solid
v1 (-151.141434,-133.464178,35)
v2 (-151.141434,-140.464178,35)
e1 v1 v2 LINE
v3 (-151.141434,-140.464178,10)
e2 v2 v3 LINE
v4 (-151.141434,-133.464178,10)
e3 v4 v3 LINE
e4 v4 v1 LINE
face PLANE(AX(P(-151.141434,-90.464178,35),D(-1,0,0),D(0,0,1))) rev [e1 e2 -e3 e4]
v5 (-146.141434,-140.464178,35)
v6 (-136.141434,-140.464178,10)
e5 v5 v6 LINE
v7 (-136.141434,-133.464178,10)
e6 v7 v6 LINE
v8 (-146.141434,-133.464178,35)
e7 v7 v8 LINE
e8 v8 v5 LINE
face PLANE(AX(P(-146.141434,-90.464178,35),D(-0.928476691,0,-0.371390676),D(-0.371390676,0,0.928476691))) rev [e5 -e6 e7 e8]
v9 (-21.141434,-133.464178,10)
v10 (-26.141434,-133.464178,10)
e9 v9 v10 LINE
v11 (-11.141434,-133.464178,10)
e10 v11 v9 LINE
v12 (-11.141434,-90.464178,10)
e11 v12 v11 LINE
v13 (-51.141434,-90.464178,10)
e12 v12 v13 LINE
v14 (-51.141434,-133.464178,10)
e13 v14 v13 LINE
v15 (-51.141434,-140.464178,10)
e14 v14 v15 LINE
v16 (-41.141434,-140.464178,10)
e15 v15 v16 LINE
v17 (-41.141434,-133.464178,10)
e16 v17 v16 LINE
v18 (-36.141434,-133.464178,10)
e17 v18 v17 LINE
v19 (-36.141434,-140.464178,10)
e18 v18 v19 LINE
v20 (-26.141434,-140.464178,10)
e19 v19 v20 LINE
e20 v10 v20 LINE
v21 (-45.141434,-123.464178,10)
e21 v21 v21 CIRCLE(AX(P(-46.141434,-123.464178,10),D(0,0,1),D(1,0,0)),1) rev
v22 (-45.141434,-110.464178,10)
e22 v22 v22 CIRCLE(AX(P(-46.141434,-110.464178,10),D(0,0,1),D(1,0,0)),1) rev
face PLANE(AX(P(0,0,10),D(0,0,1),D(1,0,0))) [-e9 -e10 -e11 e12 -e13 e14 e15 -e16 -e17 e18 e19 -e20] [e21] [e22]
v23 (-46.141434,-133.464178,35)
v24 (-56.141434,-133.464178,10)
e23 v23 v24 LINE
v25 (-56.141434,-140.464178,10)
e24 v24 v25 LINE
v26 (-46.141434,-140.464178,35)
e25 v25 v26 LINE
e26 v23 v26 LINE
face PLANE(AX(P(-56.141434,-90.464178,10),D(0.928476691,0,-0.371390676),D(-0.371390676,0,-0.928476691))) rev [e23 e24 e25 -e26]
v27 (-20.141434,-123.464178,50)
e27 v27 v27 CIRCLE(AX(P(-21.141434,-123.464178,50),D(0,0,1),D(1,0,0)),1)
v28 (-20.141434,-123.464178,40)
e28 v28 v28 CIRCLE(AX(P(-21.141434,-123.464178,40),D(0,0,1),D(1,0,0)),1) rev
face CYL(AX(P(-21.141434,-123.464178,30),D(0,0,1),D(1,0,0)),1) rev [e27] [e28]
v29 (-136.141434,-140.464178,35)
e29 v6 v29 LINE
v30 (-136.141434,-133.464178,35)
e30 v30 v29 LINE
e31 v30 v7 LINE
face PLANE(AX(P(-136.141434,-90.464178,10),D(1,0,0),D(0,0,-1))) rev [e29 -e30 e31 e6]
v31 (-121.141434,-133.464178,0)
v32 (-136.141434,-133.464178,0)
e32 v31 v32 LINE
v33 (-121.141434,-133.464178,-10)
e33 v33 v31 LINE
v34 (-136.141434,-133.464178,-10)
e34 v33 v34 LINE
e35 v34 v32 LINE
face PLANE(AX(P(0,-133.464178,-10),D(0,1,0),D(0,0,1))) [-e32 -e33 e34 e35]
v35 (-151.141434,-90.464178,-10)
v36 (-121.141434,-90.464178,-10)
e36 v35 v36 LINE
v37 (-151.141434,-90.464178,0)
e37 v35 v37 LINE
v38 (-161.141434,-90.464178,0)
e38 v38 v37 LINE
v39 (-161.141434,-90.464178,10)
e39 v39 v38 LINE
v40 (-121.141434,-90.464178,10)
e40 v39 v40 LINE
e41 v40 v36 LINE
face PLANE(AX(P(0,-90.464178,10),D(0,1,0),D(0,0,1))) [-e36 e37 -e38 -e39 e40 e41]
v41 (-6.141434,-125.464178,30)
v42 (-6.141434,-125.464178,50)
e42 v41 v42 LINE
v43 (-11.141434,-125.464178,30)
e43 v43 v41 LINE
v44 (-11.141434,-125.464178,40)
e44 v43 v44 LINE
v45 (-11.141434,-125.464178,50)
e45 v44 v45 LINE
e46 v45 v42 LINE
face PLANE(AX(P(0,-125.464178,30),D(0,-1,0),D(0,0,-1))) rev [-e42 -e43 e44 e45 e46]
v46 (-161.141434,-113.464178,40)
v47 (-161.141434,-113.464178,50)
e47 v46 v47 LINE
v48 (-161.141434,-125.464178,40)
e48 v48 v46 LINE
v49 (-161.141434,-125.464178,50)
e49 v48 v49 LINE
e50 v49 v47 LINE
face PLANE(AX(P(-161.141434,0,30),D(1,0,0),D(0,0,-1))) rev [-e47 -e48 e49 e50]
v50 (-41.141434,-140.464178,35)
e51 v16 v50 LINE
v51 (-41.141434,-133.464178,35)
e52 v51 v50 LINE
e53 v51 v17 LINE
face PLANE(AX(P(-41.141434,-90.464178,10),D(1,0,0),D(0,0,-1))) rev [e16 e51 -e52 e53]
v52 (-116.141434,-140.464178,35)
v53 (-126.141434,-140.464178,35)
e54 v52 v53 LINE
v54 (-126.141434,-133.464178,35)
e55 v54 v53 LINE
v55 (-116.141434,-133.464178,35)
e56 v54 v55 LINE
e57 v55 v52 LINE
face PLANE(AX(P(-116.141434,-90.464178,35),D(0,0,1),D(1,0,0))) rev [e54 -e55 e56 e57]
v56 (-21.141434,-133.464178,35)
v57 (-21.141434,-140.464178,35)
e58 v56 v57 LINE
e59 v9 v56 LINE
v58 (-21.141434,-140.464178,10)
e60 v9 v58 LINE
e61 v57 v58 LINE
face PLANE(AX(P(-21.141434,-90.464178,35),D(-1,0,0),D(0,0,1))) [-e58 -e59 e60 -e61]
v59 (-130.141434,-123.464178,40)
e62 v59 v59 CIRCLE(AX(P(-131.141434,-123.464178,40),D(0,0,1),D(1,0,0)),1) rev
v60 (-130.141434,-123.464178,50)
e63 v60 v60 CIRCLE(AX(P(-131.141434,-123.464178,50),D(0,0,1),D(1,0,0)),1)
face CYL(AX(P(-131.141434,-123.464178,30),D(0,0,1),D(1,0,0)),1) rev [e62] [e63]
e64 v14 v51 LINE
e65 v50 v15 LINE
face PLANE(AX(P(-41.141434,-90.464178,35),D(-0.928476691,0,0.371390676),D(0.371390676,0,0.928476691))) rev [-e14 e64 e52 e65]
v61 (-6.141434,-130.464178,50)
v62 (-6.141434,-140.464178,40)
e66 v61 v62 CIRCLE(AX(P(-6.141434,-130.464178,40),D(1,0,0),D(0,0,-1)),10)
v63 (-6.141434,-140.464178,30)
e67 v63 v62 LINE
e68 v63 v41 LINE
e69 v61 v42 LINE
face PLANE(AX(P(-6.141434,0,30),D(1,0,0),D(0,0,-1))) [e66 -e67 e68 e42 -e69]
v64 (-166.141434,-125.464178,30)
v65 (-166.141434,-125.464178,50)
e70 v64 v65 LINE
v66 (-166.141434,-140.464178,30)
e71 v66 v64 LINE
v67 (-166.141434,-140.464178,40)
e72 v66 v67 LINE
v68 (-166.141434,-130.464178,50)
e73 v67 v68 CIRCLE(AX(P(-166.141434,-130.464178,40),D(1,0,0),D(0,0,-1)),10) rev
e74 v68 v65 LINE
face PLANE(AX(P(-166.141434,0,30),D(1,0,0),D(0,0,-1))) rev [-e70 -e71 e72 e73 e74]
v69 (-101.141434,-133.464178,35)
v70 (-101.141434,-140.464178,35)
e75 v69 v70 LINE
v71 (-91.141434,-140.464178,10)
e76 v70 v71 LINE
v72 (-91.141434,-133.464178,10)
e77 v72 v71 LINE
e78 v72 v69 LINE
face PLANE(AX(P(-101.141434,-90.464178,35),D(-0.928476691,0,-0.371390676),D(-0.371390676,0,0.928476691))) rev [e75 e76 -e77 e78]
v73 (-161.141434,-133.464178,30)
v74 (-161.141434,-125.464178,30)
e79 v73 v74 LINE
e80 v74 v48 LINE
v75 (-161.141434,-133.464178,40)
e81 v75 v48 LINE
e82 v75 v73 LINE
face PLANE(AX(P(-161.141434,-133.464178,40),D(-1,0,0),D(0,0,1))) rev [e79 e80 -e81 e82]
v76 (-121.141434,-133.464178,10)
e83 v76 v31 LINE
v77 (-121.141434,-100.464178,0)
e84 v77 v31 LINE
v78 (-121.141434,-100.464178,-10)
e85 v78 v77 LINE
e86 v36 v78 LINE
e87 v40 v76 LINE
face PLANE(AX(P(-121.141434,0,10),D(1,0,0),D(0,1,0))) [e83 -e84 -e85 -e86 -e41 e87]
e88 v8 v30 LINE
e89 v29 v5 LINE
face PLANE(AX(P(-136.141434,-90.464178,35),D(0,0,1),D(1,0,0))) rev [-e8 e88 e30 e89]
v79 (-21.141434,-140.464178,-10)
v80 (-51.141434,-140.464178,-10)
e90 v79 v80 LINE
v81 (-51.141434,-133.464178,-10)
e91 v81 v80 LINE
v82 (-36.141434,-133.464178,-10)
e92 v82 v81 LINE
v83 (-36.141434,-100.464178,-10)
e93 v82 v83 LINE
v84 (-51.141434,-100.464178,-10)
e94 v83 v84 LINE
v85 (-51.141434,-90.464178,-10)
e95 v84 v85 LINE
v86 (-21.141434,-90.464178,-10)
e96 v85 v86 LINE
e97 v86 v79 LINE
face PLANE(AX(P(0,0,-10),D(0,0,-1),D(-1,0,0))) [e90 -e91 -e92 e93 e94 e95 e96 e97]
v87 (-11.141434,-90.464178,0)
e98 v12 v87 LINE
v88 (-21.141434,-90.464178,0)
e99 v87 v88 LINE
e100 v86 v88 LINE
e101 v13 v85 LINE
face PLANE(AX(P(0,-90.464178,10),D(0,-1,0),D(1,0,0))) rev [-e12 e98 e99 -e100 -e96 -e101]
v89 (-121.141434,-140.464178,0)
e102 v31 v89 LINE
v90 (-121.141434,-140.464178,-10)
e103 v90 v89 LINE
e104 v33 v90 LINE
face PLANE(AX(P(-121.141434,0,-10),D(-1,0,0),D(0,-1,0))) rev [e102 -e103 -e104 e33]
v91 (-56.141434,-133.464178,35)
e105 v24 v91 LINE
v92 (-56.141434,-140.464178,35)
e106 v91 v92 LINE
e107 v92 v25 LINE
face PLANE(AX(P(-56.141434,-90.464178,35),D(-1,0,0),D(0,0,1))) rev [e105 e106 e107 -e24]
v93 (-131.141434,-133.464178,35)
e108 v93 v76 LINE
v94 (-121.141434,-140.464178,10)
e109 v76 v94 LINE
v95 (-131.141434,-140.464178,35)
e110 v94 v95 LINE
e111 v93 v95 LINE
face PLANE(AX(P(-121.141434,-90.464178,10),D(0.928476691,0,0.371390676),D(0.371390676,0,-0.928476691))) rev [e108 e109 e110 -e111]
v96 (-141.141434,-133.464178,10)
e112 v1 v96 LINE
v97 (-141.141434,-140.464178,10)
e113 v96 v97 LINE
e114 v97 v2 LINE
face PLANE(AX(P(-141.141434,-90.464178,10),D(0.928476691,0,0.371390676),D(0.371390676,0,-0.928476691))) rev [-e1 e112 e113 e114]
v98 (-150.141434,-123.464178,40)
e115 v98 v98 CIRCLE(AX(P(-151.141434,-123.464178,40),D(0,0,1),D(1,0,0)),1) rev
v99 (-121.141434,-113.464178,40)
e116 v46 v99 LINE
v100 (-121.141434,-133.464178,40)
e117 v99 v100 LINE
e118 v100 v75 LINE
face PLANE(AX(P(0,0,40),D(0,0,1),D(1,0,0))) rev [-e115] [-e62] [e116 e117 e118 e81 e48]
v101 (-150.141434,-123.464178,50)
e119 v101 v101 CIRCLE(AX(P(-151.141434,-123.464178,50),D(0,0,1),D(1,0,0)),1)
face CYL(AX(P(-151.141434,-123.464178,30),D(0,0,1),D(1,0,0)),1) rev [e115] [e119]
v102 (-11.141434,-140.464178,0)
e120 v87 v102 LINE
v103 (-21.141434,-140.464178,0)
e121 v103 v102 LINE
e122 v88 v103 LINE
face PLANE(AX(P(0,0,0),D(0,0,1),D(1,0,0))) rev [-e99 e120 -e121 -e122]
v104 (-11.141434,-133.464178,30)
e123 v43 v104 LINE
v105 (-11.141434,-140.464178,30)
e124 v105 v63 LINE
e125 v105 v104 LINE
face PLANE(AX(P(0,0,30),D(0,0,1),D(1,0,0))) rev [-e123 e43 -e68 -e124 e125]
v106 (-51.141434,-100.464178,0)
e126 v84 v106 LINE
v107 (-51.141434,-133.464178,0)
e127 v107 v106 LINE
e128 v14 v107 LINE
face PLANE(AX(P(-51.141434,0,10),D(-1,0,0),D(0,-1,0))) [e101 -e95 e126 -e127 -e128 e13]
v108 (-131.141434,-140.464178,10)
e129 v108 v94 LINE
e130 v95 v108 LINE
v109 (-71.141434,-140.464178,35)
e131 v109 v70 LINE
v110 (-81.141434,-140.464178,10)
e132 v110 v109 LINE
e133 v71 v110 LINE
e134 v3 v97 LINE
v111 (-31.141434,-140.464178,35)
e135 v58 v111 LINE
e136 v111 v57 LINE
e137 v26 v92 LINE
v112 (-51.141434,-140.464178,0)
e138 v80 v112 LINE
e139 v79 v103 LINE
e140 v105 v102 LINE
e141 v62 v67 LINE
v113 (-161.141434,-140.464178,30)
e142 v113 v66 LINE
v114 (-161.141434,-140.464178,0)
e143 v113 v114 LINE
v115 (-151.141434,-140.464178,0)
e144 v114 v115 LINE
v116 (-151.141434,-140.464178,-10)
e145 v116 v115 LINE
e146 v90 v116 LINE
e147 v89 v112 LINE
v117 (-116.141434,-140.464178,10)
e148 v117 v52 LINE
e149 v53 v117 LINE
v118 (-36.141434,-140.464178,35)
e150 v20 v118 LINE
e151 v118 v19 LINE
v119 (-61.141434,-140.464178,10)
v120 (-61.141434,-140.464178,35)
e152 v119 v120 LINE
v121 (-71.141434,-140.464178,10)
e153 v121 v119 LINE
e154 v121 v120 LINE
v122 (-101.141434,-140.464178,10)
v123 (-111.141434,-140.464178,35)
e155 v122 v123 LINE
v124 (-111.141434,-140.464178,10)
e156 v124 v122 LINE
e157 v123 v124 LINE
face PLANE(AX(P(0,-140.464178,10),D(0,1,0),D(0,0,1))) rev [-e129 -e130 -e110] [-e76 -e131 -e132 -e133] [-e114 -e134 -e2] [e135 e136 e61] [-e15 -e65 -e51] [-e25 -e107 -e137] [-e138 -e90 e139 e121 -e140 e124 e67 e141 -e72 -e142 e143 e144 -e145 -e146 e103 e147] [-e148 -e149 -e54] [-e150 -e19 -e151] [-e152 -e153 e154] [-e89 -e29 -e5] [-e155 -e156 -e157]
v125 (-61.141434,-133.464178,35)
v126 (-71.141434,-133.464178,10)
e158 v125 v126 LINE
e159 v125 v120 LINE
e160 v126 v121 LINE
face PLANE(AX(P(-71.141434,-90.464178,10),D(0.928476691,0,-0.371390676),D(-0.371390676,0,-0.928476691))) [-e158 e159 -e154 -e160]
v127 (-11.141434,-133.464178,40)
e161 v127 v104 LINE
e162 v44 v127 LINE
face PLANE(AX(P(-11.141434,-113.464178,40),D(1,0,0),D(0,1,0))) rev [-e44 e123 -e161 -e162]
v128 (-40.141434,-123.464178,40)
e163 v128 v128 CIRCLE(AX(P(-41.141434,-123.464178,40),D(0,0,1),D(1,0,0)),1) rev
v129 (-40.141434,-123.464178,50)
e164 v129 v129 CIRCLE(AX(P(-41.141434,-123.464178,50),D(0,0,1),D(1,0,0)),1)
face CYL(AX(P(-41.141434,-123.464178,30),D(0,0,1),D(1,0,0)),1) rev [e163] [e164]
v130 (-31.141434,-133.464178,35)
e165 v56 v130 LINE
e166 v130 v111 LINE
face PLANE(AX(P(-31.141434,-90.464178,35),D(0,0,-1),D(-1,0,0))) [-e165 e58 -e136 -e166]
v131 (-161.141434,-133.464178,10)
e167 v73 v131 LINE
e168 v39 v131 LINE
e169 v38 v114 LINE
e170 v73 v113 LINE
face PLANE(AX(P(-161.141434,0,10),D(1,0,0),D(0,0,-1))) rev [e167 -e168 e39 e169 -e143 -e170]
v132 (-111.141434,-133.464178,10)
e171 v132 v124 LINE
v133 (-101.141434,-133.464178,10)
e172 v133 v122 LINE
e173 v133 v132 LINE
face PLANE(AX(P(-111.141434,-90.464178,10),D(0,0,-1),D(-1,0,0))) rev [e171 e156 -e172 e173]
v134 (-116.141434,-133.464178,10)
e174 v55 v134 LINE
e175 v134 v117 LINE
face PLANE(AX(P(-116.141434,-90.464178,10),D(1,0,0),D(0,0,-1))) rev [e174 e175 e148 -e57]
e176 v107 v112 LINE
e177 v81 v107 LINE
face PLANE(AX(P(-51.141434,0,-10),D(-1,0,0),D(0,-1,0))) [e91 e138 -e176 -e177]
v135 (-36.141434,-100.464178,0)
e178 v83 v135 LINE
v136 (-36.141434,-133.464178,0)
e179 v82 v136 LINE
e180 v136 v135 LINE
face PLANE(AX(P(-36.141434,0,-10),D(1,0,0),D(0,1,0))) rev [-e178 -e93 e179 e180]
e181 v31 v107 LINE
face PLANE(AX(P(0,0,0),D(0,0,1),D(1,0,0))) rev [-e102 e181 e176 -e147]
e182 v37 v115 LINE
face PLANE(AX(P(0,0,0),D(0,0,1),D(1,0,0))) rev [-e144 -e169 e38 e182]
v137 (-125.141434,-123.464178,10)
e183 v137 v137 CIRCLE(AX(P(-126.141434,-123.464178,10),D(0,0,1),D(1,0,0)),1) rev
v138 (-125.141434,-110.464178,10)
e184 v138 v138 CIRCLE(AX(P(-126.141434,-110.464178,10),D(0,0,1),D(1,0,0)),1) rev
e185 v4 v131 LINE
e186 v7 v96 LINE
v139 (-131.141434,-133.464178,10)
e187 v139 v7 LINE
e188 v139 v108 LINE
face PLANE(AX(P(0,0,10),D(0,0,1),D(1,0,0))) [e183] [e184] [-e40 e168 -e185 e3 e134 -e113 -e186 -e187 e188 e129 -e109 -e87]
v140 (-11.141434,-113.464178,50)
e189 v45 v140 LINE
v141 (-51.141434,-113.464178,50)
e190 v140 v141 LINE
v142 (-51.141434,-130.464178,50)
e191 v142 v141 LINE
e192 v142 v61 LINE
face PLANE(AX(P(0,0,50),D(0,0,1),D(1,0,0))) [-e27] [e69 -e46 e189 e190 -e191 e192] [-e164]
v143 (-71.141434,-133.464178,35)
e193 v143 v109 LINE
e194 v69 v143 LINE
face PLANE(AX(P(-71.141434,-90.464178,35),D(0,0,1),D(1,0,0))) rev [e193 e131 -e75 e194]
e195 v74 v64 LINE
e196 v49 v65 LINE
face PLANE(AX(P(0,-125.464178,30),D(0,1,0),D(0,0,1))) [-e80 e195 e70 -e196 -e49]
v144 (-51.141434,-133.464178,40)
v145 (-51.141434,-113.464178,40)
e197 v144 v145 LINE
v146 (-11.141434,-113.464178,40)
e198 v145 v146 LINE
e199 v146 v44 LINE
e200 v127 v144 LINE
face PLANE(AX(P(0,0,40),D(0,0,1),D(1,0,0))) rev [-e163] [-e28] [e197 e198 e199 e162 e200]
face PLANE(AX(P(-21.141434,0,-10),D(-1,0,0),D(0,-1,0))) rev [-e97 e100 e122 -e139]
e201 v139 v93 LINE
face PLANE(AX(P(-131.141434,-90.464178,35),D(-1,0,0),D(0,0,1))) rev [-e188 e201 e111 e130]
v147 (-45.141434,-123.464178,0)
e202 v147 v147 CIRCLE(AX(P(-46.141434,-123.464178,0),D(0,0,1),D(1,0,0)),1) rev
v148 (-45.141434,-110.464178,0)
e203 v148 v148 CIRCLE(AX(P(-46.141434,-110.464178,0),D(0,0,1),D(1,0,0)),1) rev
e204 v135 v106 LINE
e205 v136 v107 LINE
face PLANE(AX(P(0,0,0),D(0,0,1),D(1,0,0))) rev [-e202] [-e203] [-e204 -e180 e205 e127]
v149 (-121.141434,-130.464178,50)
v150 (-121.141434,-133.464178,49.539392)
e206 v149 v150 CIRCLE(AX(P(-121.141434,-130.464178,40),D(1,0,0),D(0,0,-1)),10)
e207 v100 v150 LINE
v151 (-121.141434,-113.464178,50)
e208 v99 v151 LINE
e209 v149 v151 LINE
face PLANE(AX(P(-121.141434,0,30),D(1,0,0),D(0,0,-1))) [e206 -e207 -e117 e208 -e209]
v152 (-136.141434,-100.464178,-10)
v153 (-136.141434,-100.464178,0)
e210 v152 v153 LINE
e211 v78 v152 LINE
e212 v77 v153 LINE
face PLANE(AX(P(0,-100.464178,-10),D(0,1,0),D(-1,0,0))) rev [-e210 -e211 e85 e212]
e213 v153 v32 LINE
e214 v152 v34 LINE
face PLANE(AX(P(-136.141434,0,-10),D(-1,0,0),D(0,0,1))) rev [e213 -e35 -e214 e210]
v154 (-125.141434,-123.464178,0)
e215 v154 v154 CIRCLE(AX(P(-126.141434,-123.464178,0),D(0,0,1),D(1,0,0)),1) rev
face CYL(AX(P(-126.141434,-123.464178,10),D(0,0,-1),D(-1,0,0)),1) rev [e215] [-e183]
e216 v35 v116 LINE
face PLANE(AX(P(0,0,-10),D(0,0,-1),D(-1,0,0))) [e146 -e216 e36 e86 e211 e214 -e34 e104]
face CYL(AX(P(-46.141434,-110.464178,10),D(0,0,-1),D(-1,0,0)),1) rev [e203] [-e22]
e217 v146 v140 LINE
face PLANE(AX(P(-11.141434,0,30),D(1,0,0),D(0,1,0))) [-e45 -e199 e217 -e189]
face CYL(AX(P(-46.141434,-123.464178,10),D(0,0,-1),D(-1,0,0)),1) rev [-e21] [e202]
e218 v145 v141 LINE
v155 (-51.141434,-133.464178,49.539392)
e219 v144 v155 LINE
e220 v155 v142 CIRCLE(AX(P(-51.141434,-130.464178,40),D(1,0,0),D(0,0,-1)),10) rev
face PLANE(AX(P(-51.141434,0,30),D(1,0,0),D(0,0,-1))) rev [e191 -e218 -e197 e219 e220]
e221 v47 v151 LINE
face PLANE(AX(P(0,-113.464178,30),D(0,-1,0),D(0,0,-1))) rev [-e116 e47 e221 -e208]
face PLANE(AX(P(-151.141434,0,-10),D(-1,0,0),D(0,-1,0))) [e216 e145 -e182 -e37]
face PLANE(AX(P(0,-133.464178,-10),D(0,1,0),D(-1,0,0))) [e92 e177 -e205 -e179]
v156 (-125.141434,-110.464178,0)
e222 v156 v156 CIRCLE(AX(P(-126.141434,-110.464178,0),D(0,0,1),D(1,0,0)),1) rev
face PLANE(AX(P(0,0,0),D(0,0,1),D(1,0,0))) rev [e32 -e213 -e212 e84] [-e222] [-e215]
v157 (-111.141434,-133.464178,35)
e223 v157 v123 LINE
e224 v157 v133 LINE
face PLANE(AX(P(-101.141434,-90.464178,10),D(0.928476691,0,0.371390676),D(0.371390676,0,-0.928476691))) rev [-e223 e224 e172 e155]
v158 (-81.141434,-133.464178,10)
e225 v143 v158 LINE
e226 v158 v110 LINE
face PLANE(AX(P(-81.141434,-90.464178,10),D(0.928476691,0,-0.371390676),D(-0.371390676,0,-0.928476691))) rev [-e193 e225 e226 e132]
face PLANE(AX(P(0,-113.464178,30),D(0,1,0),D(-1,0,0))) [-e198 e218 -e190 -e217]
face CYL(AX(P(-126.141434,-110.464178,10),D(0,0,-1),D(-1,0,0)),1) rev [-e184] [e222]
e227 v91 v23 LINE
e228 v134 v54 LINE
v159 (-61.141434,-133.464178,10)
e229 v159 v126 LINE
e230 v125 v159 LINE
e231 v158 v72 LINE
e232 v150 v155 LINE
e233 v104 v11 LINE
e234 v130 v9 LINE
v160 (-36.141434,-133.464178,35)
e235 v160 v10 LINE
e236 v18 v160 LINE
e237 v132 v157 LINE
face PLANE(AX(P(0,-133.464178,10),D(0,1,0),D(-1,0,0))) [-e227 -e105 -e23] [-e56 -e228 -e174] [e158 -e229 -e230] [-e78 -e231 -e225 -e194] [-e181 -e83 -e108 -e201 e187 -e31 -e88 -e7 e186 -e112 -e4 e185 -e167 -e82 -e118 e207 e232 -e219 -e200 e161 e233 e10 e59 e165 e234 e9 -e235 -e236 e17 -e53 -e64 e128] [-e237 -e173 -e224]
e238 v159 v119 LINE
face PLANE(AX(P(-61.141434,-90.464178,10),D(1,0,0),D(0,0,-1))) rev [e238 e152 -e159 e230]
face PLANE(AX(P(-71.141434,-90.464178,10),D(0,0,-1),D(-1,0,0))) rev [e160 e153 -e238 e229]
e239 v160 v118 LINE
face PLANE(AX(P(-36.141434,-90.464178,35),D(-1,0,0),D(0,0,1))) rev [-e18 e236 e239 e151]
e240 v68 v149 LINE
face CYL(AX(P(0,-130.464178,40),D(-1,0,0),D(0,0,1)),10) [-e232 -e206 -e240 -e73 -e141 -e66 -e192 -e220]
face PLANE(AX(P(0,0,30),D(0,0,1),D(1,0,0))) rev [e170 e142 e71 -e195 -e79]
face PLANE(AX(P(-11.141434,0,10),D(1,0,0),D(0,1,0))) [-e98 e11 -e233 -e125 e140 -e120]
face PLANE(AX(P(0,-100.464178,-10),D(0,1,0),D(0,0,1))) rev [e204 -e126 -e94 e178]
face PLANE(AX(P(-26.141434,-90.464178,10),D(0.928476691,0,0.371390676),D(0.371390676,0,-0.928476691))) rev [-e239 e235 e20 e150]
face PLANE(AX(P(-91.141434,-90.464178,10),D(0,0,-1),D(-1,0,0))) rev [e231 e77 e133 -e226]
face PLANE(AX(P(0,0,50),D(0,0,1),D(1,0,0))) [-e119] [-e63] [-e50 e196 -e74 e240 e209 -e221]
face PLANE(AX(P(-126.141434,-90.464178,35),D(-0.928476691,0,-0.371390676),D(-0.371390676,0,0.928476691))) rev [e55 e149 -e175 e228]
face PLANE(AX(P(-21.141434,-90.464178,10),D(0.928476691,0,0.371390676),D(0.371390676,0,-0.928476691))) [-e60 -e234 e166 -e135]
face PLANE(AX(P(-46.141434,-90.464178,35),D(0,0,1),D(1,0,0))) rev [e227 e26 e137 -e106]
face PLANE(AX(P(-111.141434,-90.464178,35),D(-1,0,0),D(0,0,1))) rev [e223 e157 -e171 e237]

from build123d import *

# Parameters (mm, degrees)
ESQUISSE2_W             = 15
ESQUISSE2_H             = 33
ESQUISSE2_R             = 1
ESQUISSE2_W_2           = 70
ESQUISSE2_H_2           = 7
BOSS_EXTRU_1_DEPTH      = 10
ESQUISSE3_W             = 150
ESQUISSE3_H             = 7
BOSS_EXTRU_2_DEPTH      = 40
ESQUISSE4_W             = 40
ESQUISSE4_H             = 20
ESQUISSE4_R             = 1
ESQUISSE4_W_2           = 5
ESQUISSE4_H_2           = 15
BOSS_EXTRU_3_DEPTH      = 20
ENL_V_MAT_EXTRU_1_DEPTH = 181.562942337
ESQUISSE6_W             = 40
ESQUISSE6_H             = 20
ENL_V_MAT_EXTRU_2_DEPTH = 10
CONG_1_R                = 10
BOSS_EXTRU_4_DEPTH      = 10


with BuildPart() as part:
    # Esquisse2 → Boss.-Extru.1 (new body)
    # profile 1 of 5: a face of its own
    with BuildSketch(Plane.XY):
        Polygon((-121.141434162, -90.464178298), (-161.141434162, -90.464178298), (-161.141434162, -140.464178298), (-121.141434162, -140.464178298), (-121.141434162, -133.464178298), (-136.141434162, -133.464178298), (-136.141434162, -100.464178298), (-121.141434162, -100.464178298), align=None)
    # profile 2 of 5: a face of its own
    with BuildSketch(Plane.XY):
        with Locations((-128.641434162, -116.964178298)):
            Rectangle(ESQUISSE2_W, ESQUISSE2_H)
        with Locations((-126.141434162, -123.464178298)):
            Circle(ESQUISSE2_R, mode=Mode.SUBTRACT)
        with Locations((-126.141434162, -110.464178298)):
            Circle(ESQUISSE2_R, mode=Mode.SUBTRACT)
    # profile 3 of 5: a face of its own
    with BuildSketch(Plane.XY):
        with Locations((-86.141434162, -136.964178298)):
            Rectangle(ESQUISSE2_W_2, ESQUISSE2_H_2)
    # profile 4 of 5: a face of its own
    with BuildSketch(Plane.XY):
        with Locations((-43.641434162, -116.964178298)):
            Rectangle(ESQUISSE2_W, ESQUISSE2_H)
        with Locations((-46.141434162, -123.464178298)):
            Circle(ESQUISSE2_R, mode=Mode.SUBTRACT)
        with Locations((-46.141434162, -110.464178298)):
            Circle(ESQUISSE2_R, mode=Mode.SUBTRACT)
    # profile 5 of 5: a face of its own
    with BuildSketch(Plane.XY):
        Polygon((-51.141434162, -133.464178298), (-51.141434162, -140.464178298), (-11.141434162, -140.464178298), (-11.141434162, -90.464178298), (-51.141434162, -90.464178298), (-51.141434162, -100.464178298), (-36.141434162, -100.464178298), (-36.141434162, -133.464178298), align=None)
    extrude(amount=BOSS_EXTRU_1_DEPTH)

    # Esquisse3 → Boss.-Extru.2 (add)
    with BuildSketch(Plane.XY.offset(10)):
        with Locations((-86.141434162, -136.964178298)):
            Rectangle(ESQUISSE3_W, ESQUISSE3_H)
    extrude(amount=BOSS_EXTRU_2_DEPTH)

    # Esquisse4 → Boss.-Extru.3 (add)
    # profile 1 of 4: a face of its own
    with BuildSketch(Plane.XY.offset(50)):
        with Locations((-141.141434162, -123.464178298)):
            Rectangle(ESQUISSE4_W, ESQUISSE4_H)
        with Locations((-151.141434162, -123.464178298)):
            Circle(ESQUISSE4_R, mode=Mode.SUBTRACT)
        with Locations((-131.141434162, -123.464178298)):
            Circle(ESQUISSE4_R, mode=Mode.SUBTRACT)
    # profile 2 of 4: a face of its own
    with BuildSketch(Plane.XY.offset(50)):
        with Locations((-31.141434162, -123.464178298)):
            Rectangle(ESQUISSE4_W, ESQUISSE4_H)
        with Locations((-41.141434162, -123.464178298)):
            Circle(ESQUISSE4_R, mode=Mode.SUBTRACT)
        with Locations((-21.141434162, -123.464178298)):
            Circle(ESQUISSE4_R, mode=Mode.SUBTRACT)
    # profile 3 of 4: a face of its own
    with BuildSketch(Plane.XY.offset(50)):
        with Locations((-163.641434162, -132.964178298)):
            Rectangle(ESQUISSE4_W_2, ESQUISSE4_H_2)
    # profile 4 of 4: a face of its own
    with BuildSketch(Plane.XY.offset(50)):
        with Locations((-8.641434162, -132.964178298)):
            Rectangle(ESQUISSE4_W_2, ESQUISSE4_H_2)
    extrude(amount=-BOSS_EXTRU_3_DEPTH)

    # Esquisse5 → Enlèv. mat.-Extru.1 (cut, through all)
    with BuildSketch(Plane.XZ.offset(140.464178298)):
        Polygon((-151.141434162, 35), (-151.141434162, 10), (-141.141434162, 10), align=None)
        Polygon((-146.141434162, 35), (-136.141434162, 10), (-136.141434162, 35), align=None)
        Polygon((-131.141434162, 35), (-131.141434162, 10), (-121.141434162, 10), align=None)
        Polygon((-126.141434162, 35), (-116.141434162, 10), (-116.141434162, 35), align=None)
        Polygon((-101.141434162, 35), (-91.141434162, 10), (-81.141434162, 10), (-71.141434162, 35), align=None)
        Polygon((-111.141434162, 35), (-111.141434162, 10), (-101.141434162, 10), align=None)
        Polygon((-71.141434162, 10), (-61.141434162, 10), (-61.141434162, 35), align=None)
        Polygon((-46.141434162, 35), (-56.141434162, 35), (-56.141434162, 10), align=None)
        Polygon((-41.141434162, 35), (-51.141434162, 10), (-41.141434162, 10), align=None)
        Polygon((-21.141434162, 35), (-21.141434162, 10), (-31.141434162, 35), align=None)
        Polygon((-36.141434162, 35), (-36.141434162, 10), (-26.141434162, 10), align=None)
    extrude(amount=-ENL_V_MAT_EXTRU_1_DEPTH, mode=Mode.SUBTRACT)

    # Esquisse6 → Enlèv. mat.-Extru.2 (cut)
    with BuildSketch(Plane(origin=(0, 0, 30), x_dir=(-1, 0, 0), z_dir=(0, 0, -1))):
        with Locations((31.141434162, -123.464178298)):
            Rectangle(ESQUISSE6_W, ESQUISSE6_H)
        with Locations((141.141434162, -123.464178298)):
            Rectangle(ESQUISSE6_W, ESQUISSE6_H)
    extrude(amount=-ENL_V_MAT_EXTRU_2_DEPTH, mode=Mode.SUBTRACT)

    # Congé1
    # the kernel refuses this fillet: 10 mm, written as the material it takes off along each edge
    with BuildSketch(Plane(origin=(18.858565838, -140.464178298, 50), x_dir=(0, 1, 0), z_dir=(-1, 0, 0))) as cong_1_piece_1:
        with BuildLine():
            CenterArc((CONG_1_R, CONG_1_R), CONG_1_R, 180, 90)
            Line((0, CONG_1_R), (0, 0))
            Line((0, 0), (CONG_1_R, 0))
        make_face()
    extrude(amount=210, mode=Mode.SUBTRACT)

    # Esquisse7 → Boss.-Extru.4 (add)
    with BuildSketch(Plane(origin=(0, 0, 0), x_dir=(-1, 0, 0), z_dir=(0, 0, -1))):
        Polygon((51.141434162, -100.464178298), (51.141434162, -90.464178298), (21.141434162, -90.464178298), (21.141434162, -140.464178298), (51.141434162, -140.464178298), (51.141434162, -133.464178298), (36.141434162, -133.464178298), (36.141434162, -100.464178298), align=None)
        Polygon((121.141434162, -133.464178298), (121.141434162, -140.464178298), (151.141434162, -140.464178298), (151.141434162, -90.464178298), (121.141434162, -90.464178298), (121.141434162, -100.464178298), (136.141434162, -100.464178298), (136.141434162, -133.464178298), align=None)
    extrude(amount=BOSS_EXTRU_4_DEPTH)


solid = part.part
